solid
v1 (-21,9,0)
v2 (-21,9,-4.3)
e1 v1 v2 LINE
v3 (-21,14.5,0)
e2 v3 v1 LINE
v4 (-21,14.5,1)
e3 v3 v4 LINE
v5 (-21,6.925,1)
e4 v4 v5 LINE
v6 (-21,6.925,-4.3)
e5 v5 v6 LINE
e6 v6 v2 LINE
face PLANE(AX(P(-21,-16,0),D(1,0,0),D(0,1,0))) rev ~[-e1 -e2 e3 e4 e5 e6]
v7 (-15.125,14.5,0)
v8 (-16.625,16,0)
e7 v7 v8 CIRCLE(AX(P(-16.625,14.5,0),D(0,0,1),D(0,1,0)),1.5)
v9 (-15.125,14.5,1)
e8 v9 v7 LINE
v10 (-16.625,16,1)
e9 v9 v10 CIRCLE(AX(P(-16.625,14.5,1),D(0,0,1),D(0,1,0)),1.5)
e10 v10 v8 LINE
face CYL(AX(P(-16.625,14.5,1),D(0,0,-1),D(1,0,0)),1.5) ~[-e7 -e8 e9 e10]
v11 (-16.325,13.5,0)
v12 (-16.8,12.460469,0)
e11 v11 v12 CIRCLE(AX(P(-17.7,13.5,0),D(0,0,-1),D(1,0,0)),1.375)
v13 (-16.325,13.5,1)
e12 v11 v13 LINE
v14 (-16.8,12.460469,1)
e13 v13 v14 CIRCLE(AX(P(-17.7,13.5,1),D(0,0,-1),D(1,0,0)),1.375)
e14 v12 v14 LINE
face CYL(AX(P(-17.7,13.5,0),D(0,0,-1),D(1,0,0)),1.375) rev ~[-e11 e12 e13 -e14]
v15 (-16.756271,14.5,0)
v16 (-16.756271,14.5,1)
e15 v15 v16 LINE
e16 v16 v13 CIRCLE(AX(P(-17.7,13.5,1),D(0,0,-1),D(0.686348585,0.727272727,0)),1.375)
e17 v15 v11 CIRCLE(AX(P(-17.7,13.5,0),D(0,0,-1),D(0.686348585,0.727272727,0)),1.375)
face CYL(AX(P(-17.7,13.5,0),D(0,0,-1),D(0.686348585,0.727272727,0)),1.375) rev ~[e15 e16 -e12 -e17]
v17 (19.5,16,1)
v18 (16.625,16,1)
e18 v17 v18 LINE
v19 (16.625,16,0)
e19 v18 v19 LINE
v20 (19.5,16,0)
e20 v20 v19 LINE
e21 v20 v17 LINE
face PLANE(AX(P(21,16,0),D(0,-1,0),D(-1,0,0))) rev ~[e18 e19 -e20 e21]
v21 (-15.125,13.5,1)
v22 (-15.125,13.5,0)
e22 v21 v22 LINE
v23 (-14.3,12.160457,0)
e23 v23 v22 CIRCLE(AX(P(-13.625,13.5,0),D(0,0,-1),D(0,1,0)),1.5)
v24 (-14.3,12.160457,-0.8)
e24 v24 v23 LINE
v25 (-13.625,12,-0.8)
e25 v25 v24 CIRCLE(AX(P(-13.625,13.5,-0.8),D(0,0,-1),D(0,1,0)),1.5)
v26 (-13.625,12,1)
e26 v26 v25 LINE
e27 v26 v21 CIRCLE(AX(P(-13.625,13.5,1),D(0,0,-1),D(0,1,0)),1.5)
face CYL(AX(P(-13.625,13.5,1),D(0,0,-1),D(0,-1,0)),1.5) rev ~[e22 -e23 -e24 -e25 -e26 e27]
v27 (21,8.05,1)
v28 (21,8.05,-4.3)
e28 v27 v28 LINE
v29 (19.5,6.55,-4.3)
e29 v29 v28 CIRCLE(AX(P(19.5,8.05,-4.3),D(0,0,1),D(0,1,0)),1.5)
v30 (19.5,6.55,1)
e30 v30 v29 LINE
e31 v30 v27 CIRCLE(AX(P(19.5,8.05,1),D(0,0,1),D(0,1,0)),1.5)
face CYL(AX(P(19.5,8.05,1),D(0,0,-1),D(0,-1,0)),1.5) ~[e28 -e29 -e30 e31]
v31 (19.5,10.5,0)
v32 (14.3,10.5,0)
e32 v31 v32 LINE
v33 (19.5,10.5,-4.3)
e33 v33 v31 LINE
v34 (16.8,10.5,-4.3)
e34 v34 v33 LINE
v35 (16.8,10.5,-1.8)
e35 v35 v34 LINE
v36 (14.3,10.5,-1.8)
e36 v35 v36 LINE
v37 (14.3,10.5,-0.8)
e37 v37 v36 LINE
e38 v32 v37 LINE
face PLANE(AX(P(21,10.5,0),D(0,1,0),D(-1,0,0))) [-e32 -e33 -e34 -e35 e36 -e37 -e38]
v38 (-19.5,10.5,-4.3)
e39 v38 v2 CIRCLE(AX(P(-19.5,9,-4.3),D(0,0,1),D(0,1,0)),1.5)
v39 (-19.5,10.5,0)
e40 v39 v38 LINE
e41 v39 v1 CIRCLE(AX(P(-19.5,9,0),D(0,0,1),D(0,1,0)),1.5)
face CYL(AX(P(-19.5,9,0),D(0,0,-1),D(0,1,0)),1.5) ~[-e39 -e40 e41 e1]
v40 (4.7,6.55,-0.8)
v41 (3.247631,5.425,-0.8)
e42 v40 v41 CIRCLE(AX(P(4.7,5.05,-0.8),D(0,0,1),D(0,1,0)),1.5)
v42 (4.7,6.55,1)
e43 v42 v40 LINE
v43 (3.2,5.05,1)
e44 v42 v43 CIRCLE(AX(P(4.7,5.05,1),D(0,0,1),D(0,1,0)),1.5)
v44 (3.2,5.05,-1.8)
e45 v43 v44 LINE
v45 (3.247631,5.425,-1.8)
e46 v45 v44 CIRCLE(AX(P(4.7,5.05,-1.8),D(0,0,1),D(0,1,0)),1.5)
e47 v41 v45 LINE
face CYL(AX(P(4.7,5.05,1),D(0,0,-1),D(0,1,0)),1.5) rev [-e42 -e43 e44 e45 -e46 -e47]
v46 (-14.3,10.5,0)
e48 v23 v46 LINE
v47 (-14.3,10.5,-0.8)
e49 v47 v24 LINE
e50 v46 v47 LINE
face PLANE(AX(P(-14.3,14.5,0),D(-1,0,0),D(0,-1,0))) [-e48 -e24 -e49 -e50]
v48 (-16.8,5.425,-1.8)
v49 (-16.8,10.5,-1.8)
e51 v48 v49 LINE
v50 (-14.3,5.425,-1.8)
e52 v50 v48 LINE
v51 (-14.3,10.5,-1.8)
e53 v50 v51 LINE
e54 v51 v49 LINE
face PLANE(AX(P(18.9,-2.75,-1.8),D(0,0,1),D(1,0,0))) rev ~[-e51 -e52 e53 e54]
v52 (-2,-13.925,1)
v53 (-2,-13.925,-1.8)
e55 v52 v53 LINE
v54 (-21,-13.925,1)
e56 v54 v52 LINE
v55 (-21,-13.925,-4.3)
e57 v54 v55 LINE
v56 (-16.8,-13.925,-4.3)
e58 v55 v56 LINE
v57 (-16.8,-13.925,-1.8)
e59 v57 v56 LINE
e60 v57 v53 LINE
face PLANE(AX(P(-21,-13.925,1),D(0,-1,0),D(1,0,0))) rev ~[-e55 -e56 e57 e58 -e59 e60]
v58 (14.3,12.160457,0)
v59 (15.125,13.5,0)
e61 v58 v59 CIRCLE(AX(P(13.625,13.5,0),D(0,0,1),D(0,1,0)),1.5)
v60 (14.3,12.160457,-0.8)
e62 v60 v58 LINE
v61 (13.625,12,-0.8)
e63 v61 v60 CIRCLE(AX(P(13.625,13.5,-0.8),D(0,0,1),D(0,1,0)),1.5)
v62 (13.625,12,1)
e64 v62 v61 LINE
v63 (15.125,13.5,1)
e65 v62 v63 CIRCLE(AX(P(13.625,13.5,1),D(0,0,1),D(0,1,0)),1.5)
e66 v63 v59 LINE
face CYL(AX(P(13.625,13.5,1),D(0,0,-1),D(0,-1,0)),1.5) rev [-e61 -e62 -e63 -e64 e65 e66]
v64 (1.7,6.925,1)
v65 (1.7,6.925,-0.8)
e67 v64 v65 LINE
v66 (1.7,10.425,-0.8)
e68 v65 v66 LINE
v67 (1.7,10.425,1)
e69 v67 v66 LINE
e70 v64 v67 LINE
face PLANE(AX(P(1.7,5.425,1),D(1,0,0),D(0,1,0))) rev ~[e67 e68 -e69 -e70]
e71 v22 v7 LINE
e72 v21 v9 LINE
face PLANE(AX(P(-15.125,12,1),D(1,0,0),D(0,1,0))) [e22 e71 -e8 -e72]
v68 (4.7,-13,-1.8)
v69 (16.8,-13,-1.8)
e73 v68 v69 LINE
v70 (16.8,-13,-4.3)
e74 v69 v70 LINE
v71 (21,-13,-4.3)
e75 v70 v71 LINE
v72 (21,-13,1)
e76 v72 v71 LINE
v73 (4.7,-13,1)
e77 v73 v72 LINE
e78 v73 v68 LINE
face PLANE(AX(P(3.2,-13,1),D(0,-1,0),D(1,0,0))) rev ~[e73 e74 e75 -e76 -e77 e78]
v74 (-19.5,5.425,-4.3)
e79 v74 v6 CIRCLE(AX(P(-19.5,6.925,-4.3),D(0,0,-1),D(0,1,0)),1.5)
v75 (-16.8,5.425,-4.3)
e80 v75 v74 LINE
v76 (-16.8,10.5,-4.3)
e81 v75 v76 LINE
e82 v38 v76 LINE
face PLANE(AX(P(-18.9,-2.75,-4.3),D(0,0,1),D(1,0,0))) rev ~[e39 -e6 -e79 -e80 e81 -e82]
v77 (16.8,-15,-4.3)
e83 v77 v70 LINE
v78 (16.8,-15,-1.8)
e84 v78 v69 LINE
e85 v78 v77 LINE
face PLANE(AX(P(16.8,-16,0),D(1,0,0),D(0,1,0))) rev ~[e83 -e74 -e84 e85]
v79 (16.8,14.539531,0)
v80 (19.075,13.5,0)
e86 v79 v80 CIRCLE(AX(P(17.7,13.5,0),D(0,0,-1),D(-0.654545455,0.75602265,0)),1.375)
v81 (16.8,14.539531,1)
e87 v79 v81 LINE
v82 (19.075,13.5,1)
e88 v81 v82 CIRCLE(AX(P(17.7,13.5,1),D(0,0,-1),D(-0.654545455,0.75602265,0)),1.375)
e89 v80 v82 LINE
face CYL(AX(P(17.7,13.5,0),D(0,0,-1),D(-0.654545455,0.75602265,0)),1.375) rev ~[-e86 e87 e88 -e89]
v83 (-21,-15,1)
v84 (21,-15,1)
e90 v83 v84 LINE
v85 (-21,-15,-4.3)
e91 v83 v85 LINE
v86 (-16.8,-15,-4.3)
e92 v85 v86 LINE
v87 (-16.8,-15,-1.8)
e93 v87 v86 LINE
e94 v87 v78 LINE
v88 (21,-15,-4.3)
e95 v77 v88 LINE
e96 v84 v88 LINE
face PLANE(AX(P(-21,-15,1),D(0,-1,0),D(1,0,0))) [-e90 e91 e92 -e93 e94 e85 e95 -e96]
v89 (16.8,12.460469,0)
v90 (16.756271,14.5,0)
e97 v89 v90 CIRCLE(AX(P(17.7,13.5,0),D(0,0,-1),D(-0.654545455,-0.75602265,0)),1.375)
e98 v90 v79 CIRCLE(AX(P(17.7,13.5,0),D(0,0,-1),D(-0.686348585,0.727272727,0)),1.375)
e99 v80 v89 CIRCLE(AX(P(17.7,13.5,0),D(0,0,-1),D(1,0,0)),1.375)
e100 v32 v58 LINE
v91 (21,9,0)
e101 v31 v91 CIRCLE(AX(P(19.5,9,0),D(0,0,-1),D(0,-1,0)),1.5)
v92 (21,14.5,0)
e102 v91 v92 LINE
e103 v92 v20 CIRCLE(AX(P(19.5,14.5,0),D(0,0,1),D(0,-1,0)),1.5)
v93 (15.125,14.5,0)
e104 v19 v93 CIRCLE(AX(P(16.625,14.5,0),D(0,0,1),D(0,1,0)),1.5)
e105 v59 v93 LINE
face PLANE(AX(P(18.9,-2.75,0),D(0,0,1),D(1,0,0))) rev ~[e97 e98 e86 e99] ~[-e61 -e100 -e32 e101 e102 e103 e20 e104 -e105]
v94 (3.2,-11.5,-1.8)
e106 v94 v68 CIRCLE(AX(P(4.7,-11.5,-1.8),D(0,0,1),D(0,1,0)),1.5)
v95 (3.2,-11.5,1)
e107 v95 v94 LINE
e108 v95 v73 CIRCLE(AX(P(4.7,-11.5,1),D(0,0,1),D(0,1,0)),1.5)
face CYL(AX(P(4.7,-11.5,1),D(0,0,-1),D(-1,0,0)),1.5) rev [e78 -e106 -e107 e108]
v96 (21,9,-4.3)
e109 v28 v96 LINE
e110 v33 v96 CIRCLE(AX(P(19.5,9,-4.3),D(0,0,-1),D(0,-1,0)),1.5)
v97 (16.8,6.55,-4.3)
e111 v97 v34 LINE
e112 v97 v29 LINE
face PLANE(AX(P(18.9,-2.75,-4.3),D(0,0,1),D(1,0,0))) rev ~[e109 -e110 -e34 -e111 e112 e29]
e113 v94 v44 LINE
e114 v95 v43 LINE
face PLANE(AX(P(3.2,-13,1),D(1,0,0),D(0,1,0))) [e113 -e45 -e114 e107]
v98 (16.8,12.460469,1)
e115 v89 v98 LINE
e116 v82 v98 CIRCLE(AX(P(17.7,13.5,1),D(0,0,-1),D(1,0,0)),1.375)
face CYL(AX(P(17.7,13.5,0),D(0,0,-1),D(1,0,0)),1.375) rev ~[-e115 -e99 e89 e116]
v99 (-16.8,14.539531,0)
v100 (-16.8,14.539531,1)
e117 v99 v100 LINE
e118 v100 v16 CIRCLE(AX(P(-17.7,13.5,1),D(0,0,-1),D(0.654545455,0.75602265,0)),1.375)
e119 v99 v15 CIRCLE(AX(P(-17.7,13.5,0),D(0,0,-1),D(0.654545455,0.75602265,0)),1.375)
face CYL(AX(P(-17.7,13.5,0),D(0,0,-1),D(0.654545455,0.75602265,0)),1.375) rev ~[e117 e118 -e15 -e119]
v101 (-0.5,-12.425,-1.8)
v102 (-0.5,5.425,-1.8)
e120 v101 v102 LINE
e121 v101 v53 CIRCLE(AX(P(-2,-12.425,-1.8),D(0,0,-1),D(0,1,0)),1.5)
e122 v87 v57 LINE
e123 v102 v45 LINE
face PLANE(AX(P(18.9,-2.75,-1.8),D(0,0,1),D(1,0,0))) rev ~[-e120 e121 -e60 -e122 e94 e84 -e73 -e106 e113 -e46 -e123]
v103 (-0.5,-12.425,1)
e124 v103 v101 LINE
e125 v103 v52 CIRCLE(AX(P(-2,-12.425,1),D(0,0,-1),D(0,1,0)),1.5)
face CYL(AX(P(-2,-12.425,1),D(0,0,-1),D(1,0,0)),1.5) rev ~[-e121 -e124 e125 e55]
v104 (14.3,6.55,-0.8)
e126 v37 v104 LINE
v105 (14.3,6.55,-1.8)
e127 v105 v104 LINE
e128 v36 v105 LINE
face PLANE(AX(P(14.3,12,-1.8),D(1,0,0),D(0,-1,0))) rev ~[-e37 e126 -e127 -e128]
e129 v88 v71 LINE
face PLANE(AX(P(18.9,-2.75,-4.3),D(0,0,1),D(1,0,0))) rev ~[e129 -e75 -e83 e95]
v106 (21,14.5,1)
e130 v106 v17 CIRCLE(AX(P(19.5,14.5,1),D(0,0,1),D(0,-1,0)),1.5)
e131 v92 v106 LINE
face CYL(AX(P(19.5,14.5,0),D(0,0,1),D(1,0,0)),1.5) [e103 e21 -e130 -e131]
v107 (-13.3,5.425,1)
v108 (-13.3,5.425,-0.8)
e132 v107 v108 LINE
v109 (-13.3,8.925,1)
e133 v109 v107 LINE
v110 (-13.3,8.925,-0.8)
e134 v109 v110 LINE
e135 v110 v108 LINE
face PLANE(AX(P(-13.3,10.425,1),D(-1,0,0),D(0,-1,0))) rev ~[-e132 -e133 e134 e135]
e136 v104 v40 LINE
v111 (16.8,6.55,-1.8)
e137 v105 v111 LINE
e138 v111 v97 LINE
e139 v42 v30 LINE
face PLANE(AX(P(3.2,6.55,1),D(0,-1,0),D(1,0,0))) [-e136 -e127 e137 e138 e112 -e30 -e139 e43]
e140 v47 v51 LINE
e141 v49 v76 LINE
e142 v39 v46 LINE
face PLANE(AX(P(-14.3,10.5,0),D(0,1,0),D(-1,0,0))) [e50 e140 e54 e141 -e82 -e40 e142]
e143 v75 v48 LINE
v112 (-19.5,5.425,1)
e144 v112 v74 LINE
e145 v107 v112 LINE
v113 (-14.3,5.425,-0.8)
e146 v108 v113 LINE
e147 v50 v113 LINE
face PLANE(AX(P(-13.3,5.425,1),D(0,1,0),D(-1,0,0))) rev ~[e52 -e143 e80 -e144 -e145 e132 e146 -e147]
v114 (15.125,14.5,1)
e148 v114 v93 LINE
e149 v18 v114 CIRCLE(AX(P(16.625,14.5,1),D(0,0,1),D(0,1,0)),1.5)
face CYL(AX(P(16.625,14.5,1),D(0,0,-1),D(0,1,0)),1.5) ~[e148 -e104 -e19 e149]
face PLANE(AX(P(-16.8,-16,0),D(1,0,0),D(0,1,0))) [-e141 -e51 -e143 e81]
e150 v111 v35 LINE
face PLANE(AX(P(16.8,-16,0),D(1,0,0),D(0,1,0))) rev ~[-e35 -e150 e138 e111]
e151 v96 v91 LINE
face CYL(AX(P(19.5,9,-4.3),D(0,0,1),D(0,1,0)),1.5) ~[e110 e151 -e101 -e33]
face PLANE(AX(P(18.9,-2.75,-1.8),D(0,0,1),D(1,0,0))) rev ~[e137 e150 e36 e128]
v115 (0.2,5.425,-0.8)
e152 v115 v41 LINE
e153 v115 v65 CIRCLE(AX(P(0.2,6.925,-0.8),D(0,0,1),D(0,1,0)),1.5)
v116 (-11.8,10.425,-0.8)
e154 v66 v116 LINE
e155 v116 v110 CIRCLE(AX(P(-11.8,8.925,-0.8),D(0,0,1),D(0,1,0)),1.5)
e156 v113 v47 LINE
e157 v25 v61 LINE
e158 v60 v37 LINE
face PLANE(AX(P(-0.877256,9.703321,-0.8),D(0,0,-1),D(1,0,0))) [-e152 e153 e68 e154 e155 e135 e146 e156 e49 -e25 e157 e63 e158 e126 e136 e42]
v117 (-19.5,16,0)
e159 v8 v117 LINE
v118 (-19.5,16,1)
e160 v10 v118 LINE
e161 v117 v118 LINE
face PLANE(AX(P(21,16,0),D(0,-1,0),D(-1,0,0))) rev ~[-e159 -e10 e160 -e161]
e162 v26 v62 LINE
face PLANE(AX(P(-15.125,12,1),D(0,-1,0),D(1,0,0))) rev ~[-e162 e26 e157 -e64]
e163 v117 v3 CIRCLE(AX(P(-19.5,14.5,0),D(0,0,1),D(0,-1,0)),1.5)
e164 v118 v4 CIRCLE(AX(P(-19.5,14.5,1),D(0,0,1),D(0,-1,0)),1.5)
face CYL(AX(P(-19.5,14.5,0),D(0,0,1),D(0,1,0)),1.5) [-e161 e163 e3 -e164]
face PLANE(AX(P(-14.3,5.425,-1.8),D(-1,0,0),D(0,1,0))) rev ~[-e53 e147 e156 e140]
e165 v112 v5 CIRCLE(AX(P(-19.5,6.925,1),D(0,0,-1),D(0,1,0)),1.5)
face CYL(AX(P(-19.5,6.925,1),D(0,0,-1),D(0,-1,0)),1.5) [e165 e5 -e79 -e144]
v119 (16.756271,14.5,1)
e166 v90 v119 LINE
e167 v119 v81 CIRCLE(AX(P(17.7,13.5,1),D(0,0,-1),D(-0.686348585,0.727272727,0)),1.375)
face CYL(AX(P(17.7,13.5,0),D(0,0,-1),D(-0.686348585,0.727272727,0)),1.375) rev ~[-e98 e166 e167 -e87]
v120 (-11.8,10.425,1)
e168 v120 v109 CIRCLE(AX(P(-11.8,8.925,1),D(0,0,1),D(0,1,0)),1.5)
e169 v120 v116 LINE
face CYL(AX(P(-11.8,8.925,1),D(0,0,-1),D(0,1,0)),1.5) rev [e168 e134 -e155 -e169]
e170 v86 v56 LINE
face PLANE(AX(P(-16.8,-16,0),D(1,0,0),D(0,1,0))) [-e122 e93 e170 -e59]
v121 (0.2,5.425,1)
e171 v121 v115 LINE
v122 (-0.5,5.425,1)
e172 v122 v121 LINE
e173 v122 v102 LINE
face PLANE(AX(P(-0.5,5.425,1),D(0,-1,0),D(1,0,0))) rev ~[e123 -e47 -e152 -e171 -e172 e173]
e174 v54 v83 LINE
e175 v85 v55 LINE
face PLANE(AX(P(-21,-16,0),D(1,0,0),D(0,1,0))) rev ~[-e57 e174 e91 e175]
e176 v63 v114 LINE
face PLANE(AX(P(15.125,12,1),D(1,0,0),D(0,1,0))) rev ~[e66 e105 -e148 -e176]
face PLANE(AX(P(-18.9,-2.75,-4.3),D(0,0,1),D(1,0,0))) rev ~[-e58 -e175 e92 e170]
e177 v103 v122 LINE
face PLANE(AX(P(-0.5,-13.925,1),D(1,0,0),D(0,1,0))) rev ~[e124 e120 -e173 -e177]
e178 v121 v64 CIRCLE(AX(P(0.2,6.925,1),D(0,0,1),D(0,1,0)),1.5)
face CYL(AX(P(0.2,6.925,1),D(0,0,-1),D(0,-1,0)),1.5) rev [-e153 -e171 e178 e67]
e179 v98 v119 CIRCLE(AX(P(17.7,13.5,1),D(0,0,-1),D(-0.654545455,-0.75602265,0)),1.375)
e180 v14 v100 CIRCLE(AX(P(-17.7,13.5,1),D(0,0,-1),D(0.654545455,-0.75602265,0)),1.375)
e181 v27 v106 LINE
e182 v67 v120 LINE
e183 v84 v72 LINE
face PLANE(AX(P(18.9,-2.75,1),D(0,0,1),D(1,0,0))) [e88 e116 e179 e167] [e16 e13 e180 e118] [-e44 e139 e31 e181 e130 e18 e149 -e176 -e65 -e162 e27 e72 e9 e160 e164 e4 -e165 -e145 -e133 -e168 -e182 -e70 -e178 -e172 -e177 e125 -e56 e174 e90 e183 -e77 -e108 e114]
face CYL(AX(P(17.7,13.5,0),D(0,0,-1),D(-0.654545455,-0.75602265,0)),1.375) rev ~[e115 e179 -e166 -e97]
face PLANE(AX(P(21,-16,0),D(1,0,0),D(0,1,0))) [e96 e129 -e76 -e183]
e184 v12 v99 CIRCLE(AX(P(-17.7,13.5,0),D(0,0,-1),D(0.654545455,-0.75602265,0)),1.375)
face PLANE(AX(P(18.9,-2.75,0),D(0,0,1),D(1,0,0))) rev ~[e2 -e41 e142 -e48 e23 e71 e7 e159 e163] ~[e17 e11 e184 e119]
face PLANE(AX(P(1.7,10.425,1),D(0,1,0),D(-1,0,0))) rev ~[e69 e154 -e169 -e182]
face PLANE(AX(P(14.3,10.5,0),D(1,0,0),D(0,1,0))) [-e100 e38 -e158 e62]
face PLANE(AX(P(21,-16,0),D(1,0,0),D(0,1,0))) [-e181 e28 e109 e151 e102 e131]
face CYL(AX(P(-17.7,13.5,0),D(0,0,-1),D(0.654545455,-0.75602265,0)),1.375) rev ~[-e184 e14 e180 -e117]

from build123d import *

# Parameters (mm, degrees)
F0_W     = 4.2
F0_H     = 26.5
F0_W_2   = 23.9
F0_H_2   = 1.5
F1_DEPTH = 1
F2_DEPTH = 1.8
F3_DEPTH = 4.3
F4_W     = 17.8
F4_H     = 19.55
F4_W_2   = 30.25
F4_H_2   = 4
F4_W_3   = 42
F4_H_3   = 1
F5_DEPTH = 5.301
F7_DEPTH = 1
F8_R     = 1.5


with BuildPart() as f1:
    # F0 (on Top) → F1 (new body)
    with BuildSketch(Plane.XY):
        with Locations((18.9, -2.75)):
            Rectangle(F0_W, F0_H)
        Polygon((-16.8, -16), (16.8, -16), (16.8, 10.5), (14.3, 10.5), (14.3, 14.5), (11.95, 14.5), (-11.95, 14.5), (-14.3, 14.5), (-14.3, 10.5), (-16.8, 10.5), align=None)
        with BuildLine():
            Line((16.8, 10.5), (21, 10.5))
            Line((21, 10.5), (21, 16))
            Line((21, 16), (16.8, 16))
            Line((16.8, 16), (16.8, 14.5395311443))
            ThreePointArc((16.8, 14.5395311443), (18.2714564725, 14.7506248438), (19.075, 13.5))
            ThreePointArc((19.075, 13.5), (18.2714564725, 12.2493751562), (16.8, 12.4604688557))
            Line((16.8, 12.4604688557), (16.8, 10.5))
        make_face()
        with Locations((-18.9, -2.75)):
            Rectangle(F0_W, F0_H)
        with BuildLine():
            Line((14.3, 10.5), (16.8, 10.5))
            Line((16.8, 10.5), (16.8, 12.4604688557))
            ThreePointArc((16.8, 12.4604688557), (16.3253159421, 13.4705255898), (16.7562706956, 14.5))
            Line((16.7562706956, 14.5), (14.3, 14.5))
            Line((14.3, 14.5), (14.3, 10.5))
        make_face()
        with BuildLine():
            Line((-21, 10.5), (-16.8, 10.5))
            Line((-16.8, 10.5), (-16.8, 12.4604688557))
            ThreePointArc((-16.8, 12.4604688557), (-19.075, 13.5), (-16.8, 14.5395311443))
            Line((-16.8, 14.5395311443), (-16.8, 16))
            Line((-16.8, 16), (-21, 16))
            Line((-21, 16), (-21, 10.5))
        make_face()
        with BuildLine():
            Line((-16.8, 12.4604688557), (-16.8, 10.5))
            Line((-16.8, 10.5), (-14.3, 10.5))
            Line((-14.3, 10.5), (-14.3, 14.5))
            Line((-14.3, 14.5), (-16.7562706956, 14.5))
            ThreePointArc((-16.7562706956, 14.5), (-16.4374128162, 14.044516853), (-16.325, 13.5))
            ThreePointArc((-16.325, 13.5), (-16.4493751562, 12.9285435275), (-16.8, 12.4604688557))
        make_face()
        with BuildLine():
            Line((16.8, 14.5395311443), (16.8, 16))
            Line((16.8, 16), (11.95, 16))
            Line((11.95, 16), (11.95, 14.5))
            Line((11.95, 14.5), (14.3, 14.5))
            Line((14.3, 14.5), (16.7562706956, 14.5))
            ThreePointArc((16.7562706956, 14.5), (16.7779234767, 14.5199999437), (16.8, 14.5395311443))
        make_face()
        with Locations((0, 15.25)):
            Rectangle(F0_W_2, F0_H_2)
        with BuildLine():
            Line((-16.8, 16), (-16.8, 14.5395311443))
            ThreePointArc((-16.8, 14.5395311443), (-16.7779234767, 14.5199999437), (-16.7562706956, 14.5))
            Line((-16.7562706956, 14.5), (-14.3, 14.5))
            Line((-14.3, 14.5), (-11.95, 14.5))
            Line((-11.95, 14.5), (-11.95, 16))
            Line((-11.95, 16), (-16.8, 16))
        make_face()
    extrude(amount=F1_DEPTH)

    # F0 (on Top) → F2 (join)
    with BuildSketch(Plane.XY):
        with Locations((18.9, -2.75)):
            Rectangle(F0_W, F0_H)
        Polygon((-16.8, -16), (16.8, -16), (16.8, 10.5), (14.3, 10.5), (14.3, 14.5), (11.95, 14.5), (-11.95, 14.5), (-14.3, 14.5), (-14.3, 10.5), (-16.8, 10.5), align=None)
        with Locations((-18.9, -2.75)):
            Rectangle(F0_W, F0_H)
    extrude(amount=-F2_DEPTH)

    # F0 (on Top) → F3 (join)
    with BuildSketch(Plane.XY):
        with Locations((-18.9, -2.75)):
            Rectangle(F0_W, F0_H)
        with Locations((18.9, -2.75)):
            Rectangle(F0_W, F0_H)
    extrude(amount=-F3_DEPTH)

    # F4 (on face) → F5 (cut, through all)
    with BuildSketch(Plane.XY.offset(1)):
        Polygon((-21, 5.425), (-21, -13.925), (-0.5, -13.925), (-0.5, 5.425), (-13.3, 5.425), align=None)
        with Locations((12.1, -3.225)):
            Rectangle(F4_W, F4_H)
        with Locations((0, 14)):
            Rectangle(F4_W_2, F4_H_2)
        Polygon((-13.3, 5.425), (-0.5, 5.425), (1.7, 5.425), (1.7, 10.425), (-13.3, 10.425), align=None)
        with Locations((0, -15.5)):
            Rectangle(F4_W_3, F4_H_3)
    extrude(amount=-F5_DEPTH, mode=Mode.SUBTRACT)

    # F6 (on face) → F7 (cut)
    with BuildSketch(Plane(origin=(0, 0, -1.8), x_dir=(1, 0, 0), z_dir=(0, 0, -1))):
        Polygon((-13.3, -5.425), (-14.3, -5.425), (-14.3, -10.5), (-14.3, -12), (14.3, -12), (14.3, -10.5), (14.3, -6.55), (3.2, -6.55), (3.2, -5.425), (1.7, -5.425), (1.7, -10.425), (-13.3, -10.425), align=None)
    extrude(amount=-F7_DEPTH, mode=Mode.SUBTRACT)

    # F8
    f8_edges = [f1.edges().sort_by_distance(p)[0] for p in [
        (-21, 16, 0.5),
        (21, 16, 0.5),
        (21, 10.5, -2.15),
        (-21, 10.5, -2.15),
        (-21, 5.425, -1.65),
        (21, 6.55, -1.65),
        (-15.125, 16, 0.5),
        (15.125, 16, 0.5),
        (15.125, 12, 0.5),
        (-15.125, 12, 0.5),
        (3.2, 6.55, 0.1),
        (3.2, -13, -0.4),
        (-0.5, -13.925, -0.4),
        (-13.3, 10.425, 0.1),
        (1.7, 5.425, 0.1),
    ]]
    fillet(f8_edges, radius=F8_R)


solid = f1.part
